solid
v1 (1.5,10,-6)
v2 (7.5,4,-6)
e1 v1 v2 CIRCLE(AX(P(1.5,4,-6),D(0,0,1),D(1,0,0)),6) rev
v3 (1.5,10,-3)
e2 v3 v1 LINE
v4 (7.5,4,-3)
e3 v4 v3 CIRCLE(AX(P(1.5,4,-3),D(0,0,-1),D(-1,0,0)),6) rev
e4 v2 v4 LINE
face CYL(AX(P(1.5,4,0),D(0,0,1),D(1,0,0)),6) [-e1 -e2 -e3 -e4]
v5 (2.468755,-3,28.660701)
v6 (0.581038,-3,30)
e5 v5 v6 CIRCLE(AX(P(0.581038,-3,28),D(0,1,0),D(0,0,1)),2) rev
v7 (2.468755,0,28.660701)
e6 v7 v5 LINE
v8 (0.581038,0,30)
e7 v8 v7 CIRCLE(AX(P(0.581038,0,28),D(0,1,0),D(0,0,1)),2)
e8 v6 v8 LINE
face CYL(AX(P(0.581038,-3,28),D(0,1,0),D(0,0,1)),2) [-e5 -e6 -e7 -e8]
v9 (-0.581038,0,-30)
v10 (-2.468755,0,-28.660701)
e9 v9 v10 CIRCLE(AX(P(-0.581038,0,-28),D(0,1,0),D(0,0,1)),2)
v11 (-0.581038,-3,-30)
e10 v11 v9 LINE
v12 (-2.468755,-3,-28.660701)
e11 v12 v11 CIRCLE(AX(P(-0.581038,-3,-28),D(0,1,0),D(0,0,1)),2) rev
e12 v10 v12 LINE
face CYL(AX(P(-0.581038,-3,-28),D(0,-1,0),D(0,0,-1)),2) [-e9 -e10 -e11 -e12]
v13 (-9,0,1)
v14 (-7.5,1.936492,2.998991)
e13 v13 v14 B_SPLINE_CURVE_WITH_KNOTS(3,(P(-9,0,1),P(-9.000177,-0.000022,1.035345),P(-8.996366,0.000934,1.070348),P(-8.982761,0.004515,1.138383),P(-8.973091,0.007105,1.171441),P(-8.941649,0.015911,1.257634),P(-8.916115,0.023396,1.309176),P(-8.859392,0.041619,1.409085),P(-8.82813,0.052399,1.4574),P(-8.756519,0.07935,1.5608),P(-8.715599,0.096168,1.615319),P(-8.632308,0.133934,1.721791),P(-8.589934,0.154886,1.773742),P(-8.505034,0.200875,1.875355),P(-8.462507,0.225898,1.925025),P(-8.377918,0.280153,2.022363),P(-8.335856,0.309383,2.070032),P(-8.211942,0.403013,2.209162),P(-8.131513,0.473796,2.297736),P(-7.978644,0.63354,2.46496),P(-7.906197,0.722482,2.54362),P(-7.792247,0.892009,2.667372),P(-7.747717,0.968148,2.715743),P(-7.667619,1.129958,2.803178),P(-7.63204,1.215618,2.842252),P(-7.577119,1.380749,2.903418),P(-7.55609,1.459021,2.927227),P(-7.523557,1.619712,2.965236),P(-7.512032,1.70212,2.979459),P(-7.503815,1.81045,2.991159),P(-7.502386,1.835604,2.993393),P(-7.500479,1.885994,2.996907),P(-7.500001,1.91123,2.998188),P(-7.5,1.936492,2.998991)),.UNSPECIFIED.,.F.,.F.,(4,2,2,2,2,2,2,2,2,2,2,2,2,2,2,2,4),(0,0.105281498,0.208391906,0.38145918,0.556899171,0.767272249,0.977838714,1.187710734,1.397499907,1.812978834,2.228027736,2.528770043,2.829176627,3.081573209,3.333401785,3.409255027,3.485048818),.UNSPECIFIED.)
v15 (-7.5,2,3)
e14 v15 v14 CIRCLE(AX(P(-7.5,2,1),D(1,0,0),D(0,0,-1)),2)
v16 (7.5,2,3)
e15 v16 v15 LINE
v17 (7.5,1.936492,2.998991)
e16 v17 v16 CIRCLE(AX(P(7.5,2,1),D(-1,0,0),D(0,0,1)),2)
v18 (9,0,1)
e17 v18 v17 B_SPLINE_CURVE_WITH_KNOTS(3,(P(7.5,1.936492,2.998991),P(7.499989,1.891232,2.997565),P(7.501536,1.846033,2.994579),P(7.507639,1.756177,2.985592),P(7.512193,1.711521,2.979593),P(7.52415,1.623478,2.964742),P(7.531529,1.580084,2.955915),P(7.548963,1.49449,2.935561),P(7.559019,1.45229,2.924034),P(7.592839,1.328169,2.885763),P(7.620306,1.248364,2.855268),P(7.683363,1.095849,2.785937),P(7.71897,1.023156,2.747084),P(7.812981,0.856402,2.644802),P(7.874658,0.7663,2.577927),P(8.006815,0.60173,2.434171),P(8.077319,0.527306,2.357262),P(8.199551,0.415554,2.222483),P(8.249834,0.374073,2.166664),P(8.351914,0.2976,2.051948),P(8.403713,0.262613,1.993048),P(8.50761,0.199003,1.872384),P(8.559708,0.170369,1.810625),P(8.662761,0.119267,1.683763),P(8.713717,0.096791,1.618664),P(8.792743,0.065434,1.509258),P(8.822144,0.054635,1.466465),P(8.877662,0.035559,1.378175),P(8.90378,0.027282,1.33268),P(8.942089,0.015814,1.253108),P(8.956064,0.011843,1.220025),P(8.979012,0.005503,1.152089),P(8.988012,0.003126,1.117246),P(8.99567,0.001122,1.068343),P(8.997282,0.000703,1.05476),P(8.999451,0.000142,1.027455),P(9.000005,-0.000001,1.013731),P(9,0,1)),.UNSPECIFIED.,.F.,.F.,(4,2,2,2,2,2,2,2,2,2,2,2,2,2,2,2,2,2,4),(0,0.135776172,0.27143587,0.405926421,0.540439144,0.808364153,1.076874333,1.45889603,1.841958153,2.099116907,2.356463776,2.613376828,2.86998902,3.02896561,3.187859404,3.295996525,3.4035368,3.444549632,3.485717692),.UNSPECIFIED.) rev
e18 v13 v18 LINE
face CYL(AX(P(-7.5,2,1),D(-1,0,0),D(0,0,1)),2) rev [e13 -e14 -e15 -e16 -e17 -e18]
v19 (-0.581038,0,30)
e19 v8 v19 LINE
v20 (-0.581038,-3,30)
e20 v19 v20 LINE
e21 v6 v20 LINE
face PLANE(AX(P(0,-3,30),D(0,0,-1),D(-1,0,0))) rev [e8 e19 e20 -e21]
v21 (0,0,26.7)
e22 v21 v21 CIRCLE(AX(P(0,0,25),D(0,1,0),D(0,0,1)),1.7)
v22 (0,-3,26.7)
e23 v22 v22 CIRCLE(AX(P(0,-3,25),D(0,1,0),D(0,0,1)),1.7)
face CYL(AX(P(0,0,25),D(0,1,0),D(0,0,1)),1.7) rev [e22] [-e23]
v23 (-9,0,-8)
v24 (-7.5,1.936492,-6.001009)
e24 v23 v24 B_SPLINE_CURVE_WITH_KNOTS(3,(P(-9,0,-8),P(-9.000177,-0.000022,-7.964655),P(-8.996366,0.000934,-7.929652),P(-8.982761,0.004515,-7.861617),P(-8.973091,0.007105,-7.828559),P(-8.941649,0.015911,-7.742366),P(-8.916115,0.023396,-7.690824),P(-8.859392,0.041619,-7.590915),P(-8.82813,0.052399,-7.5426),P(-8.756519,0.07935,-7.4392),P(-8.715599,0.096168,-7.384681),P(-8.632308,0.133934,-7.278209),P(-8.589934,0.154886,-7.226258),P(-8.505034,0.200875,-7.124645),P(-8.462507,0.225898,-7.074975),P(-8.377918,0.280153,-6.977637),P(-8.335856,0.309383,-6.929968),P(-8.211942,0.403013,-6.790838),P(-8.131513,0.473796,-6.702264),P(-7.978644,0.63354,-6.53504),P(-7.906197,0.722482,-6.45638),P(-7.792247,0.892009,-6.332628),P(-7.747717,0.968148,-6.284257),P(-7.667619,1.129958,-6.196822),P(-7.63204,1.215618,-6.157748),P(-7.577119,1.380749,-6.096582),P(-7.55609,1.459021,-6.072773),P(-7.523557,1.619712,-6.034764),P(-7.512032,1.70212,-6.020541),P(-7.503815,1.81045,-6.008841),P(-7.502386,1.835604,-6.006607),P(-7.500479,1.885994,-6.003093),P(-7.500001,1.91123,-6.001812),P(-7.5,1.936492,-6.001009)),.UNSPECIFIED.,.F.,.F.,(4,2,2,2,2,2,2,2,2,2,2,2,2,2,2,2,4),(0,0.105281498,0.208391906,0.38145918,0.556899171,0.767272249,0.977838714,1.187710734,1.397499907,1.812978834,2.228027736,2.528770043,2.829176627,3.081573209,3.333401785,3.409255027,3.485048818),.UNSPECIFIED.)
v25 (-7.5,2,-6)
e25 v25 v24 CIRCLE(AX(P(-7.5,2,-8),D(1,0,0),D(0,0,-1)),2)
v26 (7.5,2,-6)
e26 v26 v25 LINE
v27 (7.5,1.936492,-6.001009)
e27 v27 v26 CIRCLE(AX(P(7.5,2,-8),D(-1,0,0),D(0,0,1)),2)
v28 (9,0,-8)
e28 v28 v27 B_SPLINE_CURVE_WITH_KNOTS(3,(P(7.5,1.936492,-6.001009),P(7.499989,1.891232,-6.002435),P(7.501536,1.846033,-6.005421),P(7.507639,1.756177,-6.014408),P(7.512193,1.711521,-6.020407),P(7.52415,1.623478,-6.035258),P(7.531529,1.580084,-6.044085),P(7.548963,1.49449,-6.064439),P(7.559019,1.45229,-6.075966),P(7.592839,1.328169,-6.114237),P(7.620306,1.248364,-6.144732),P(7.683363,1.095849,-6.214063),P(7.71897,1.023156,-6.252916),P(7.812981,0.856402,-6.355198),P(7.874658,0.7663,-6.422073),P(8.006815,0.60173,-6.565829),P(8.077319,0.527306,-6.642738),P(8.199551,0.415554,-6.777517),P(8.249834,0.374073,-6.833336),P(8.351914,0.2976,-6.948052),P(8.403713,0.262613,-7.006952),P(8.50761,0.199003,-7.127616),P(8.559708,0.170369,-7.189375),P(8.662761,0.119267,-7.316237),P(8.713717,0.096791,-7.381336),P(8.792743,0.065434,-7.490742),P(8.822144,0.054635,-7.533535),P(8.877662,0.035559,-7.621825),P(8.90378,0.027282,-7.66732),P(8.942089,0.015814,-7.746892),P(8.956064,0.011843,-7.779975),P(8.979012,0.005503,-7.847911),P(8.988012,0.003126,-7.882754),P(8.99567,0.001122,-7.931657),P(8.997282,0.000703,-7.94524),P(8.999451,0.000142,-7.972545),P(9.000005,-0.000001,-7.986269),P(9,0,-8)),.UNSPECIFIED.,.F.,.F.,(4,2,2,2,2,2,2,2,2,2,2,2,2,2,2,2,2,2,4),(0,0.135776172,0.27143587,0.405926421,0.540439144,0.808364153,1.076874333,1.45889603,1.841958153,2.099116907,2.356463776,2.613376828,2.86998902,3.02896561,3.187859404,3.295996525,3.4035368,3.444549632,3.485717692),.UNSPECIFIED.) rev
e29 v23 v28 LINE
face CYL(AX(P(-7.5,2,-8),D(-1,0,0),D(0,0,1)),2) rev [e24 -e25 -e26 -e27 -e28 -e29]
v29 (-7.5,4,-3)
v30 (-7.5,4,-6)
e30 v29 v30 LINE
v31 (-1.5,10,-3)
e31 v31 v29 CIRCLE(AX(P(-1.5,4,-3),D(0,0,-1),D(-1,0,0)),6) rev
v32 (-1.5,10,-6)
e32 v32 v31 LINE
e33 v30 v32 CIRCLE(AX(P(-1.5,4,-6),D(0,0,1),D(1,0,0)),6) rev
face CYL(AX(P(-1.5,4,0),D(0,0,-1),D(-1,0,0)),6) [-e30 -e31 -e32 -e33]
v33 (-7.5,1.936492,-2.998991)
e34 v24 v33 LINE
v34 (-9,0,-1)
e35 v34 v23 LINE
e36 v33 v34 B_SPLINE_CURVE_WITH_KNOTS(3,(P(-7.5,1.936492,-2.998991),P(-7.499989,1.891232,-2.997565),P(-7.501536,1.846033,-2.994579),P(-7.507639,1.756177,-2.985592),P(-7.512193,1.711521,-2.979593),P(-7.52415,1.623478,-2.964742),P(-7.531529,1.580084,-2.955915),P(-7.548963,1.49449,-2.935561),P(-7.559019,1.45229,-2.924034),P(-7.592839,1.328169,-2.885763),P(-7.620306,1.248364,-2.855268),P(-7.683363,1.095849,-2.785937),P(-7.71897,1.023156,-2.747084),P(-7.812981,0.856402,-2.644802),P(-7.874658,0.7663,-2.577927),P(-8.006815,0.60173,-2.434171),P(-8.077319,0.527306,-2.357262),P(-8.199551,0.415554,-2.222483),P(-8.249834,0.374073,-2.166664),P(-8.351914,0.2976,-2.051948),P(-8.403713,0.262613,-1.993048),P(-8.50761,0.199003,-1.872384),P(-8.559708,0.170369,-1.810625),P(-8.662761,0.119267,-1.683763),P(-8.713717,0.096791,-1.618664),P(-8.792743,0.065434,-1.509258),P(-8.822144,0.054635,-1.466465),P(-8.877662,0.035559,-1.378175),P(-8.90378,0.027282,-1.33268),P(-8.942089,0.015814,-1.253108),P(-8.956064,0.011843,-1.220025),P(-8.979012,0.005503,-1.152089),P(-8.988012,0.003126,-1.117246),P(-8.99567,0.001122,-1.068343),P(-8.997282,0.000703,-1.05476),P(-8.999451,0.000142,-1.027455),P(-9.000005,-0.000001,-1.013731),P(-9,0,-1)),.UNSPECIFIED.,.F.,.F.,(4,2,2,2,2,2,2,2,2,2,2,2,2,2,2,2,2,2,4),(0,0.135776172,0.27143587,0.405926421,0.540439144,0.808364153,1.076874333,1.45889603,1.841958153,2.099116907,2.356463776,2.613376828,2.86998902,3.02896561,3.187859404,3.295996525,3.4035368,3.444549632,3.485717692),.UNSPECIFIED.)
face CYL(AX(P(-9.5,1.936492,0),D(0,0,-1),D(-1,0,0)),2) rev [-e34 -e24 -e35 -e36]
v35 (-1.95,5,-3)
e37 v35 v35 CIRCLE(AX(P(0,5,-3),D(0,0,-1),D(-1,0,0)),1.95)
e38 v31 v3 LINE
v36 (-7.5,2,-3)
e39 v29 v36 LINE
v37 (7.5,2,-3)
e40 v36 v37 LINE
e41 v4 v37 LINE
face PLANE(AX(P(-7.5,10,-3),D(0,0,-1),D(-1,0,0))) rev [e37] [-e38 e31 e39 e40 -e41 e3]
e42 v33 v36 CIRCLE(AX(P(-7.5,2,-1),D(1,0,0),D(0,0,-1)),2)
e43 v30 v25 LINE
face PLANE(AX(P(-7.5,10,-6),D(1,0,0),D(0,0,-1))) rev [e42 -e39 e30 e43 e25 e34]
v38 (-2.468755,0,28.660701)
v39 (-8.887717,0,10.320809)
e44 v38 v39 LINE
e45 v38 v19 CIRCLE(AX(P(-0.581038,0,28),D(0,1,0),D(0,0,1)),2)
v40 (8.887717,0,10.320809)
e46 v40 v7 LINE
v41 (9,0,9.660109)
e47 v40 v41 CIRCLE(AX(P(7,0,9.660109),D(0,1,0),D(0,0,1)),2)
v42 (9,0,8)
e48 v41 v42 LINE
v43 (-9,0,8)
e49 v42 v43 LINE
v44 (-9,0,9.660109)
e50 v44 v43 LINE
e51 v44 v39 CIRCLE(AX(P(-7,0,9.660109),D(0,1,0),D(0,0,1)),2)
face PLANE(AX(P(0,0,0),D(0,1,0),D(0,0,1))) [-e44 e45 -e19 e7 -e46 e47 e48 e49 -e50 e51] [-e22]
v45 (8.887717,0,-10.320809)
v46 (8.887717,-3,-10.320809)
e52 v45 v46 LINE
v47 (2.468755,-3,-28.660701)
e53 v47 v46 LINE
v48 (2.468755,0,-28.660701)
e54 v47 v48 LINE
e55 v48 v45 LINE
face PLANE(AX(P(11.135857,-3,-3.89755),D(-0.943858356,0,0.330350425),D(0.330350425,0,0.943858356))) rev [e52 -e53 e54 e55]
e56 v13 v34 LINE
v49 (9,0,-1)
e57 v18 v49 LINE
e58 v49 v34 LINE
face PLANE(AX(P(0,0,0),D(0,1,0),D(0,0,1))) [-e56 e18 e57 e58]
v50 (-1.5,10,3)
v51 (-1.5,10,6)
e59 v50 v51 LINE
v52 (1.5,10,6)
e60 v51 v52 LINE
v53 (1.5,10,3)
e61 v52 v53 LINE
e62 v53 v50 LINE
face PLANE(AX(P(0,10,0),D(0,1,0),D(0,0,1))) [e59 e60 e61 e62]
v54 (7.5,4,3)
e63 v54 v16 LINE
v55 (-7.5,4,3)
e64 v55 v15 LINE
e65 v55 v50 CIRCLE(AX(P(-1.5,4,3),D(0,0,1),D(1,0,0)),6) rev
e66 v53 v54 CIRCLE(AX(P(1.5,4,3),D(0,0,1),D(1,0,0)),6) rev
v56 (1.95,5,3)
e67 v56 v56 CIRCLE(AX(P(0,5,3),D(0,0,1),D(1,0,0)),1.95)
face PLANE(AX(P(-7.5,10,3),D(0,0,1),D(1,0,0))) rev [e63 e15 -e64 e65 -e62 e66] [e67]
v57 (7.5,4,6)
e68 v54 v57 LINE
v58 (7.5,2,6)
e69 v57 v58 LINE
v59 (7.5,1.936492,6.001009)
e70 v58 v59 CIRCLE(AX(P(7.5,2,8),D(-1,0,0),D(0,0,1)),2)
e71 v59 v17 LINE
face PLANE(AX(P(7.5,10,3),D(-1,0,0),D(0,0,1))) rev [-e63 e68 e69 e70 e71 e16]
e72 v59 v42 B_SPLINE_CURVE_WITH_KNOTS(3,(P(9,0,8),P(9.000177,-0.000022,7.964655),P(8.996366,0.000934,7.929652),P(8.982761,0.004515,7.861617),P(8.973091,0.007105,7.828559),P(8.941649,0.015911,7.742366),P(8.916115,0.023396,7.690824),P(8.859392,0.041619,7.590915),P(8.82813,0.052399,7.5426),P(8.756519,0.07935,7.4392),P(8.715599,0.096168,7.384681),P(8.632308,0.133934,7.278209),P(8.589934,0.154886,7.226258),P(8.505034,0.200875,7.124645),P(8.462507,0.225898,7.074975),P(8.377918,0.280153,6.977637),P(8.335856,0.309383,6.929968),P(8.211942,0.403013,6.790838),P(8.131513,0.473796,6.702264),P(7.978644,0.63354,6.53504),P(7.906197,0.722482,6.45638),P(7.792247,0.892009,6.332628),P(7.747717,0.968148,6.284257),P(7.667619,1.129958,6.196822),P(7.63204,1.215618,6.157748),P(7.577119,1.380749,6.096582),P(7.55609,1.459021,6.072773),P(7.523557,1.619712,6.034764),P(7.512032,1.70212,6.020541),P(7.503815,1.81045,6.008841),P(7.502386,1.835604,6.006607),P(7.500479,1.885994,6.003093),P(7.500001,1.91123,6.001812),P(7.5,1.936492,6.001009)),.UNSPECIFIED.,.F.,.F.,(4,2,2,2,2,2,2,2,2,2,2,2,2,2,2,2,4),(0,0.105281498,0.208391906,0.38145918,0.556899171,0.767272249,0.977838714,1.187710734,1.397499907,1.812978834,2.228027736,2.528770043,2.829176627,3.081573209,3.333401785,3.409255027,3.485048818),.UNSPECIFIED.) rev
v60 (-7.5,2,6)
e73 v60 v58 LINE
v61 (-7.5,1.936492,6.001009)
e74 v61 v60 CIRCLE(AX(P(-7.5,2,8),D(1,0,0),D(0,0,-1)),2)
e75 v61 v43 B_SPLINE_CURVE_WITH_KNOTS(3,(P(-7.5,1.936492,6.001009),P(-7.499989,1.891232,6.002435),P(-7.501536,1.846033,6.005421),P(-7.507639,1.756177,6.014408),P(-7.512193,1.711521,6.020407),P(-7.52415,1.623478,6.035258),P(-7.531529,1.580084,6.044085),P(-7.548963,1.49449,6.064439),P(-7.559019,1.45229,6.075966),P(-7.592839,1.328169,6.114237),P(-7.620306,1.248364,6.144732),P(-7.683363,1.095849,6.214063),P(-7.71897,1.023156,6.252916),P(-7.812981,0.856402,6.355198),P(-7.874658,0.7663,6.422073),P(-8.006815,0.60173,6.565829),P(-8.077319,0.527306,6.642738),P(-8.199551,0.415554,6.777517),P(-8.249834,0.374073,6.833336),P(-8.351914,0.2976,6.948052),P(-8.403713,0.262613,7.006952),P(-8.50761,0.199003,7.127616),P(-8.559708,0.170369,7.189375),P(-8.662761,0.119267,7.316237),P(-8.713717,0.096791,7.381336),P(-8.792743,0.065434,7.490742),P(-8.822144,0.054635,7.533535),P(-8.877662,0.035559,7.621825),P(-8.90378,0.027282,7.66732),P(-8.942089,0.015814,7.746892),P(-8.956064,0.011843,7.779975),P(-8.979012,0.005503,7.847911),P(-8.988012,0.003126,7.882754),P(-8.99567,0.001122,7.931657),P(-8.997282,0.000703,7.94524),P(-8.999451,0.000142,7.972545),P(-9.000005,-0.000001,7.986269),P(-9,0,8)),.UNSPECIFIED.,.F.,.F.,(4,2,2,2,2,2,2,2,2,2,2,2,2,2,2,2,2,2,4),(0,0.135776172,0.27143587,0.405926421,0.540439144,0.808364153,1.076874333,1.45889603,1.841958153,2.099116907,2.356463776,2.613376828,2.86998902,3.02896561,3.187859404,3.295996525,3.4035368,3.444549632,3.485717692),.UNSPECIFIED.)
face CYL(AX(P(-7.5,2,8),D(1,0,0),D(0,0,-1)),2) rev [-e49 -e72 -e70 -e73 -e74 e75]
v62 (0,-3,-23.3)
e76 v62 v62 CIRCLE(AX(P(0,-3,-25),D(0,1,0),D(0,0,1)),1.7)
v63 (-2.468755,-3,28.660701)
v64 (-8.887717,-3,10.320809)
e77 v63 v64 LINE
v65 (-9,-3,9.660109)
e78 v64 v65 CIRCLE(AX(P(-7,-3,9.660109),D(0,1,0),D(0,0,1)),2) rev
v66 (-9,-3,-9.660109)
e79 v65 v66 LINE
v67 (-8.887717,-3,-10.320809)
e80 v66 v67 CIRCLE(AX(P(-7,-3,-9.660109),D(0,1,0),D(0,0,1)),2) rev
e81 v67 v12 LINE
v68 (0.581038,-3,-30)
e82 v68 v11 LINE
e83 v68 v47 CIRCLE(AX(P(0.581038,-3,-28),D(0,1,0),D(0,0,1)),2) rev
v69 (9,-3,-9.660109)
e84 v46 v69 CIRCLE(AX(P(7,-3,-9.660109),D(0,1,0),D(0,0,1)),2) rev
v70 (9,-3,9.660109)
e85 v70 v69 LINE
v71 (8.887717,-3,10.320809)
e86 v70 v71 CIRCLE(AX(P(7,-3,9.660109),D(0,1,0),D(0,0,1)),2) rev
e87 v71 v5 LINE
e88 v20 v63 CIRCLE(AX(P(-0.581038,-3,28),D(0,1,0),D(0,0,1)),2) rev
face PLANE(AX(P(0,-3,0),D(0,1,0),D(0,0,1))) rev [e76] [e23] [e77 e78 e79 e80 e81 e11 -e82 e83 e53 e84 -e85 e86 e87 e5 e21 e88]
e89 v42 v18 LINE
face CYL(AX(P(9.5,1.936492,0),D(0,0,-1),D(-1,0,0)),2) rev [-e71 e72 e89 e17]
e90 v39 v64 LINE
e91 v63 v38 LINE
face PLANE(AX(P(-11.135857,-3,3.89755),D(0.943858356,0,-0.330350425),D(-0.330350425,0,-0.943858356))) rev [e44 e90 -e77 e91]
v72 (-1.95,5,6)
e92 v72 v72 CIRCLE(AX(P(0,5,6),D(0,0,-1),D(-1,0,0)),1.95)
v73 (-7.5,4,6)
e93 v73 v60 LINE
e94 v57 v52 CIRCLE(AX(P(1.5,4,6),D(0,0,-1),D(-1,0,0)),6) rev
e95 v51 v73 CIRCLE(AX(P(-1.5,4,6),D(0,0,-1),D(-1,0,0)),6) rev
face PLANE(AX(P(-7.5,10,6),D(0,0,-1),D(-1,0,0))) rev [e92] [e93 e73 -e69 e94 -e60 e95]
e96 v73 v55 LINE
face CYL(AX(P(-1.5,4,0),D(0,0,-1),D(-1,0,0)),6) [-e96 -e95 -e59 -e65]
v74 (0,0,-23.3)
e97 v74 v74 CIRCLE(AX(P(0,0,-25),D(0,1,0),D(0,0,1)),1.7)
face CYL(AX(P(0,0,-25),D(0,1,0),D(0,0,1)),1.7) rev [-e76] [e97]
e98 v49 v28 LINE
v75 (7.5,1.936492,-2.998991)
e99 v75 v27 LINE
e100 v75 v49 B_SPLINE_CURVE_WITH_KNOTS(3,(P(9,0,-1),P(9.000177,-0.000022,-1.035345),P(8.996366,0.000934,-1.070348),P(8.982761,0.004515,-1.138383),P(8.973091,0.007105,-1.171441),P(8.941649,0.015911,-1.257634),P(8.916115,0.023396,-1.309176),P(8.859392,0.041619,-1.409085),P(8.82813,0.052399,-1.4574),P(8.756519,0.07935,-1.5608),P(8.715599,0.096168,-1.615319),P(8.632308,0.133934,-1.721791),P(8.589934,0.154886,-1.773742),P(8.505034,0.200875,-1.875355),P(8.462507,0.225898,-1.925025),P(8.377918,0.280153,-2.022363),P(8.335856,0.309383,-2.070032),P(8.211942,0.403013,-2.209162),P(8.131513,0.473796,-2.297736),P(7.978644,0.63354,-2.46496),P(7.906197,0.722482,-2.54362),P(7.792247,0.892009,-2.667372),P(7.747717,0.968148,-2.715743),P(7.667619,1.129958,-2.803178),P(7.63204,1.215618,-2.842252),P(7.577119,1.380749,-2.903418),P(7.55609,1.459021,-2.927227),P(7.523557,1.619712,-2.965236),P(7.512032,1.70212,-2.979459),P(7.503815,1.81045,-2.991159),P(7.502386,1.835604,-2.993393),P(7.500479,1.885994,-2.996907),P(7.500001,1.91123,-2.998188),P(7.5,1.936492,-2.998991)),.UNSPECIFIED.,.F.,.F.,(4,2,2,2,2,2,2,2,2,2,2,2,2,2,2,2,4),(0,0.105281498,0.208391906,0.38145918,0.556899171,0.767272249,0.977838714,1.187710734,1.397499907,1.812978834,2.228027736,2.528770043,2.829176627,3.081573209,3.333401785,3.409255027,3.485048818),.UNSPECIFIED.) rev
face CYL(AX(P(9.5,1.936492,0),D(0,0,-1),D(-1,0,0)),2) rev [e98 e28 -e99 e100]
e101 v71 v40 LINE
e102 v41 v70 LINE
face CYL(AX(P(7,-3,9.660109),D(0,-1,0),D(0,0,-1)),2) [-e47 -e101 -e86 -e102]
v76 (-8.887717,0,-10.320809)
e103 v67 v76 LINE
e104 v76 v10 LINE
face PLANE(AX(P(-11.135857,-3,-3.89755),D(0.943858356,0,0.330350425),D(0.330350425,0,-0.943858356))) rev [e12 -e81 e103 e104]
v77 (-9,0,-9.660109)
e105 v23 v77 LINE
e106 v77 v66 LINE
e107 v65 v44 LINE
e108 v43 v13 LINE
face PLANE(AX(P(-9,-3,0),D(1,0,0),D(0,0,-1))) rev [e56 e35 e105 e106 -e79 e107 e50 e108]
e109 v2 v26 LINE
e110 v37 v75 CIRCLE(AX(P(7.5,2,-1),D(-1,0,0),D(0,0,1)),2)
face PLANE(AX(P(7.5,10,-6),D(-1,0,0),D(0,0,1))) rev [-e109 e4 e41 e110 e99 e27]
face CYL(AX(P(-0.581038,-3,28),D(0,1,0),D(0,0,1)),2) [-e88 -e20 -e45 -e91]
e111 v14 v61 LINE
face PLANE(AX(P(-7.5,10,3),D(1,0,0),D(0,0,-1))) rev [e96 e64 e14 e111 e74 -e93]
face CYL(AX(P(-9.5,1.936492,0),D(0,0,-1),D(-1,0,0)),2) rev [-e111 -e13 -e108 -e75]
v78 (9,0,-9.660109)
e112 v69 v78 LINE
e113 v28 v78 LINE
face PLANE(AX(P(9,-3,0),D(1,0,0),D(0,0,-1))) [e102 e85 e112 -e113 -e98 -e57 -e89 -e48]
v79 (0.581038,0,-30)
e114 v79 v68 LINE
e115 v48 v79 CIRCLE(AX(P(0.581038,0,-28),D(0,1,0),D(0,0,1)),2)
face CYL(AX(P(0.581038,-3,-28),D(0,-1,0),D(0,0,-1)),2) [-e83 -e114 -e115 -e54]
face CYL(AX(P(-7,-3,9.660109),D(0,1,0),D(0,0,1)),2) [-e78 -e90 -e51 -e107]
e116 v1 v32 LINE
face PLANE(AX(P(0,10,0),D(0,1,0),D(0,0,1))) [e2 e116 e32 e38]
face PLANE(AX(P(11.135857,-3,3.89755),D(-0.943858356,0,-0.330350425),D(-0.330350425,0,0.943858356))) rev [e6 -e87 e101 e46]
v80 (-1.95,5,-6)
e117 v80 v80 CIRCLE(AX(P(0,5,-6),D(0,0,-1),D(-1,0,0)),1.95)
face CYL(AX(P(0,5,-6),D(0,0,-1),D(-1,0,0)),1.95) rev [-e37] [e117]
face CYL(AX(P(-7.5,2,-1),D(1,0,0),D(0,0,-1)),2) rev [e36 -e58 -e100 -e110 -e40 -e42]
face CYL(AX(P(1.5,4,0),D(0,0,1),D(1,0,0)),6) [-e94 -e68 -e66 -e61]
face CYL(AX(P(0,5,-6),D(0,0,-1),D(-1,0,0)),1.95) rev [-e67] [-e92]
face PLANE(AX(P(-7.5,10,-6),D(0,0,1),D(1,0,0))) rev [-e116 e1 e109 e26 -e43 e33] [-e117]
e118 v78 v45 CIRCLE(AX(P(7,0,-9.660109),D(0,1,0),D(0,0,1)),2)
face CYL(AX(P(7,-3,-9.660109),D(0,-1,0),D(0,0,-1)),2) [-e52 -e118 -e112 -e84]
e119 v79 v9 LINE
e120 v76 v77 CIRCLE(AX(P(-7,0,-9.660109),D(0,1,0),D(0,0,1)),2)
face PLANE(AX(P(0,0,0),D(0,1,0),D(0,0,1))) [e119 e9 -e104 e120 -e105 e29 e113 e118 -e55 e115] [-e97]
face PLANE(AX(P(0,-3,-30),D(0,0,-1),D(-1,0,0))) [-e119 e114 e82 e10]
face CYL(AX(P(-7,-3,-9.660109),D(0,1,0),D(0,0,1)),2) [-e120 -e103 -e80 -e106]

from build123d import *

# Parameters (mm, degrees)
EXTRUDE_1_DEPTH      = 3
SKETCH_2_W           = 15
SKETCH_2_H           = 3
EXTRUDE_2_DEPTH      = 10
FILLET_1_R           = 6
FILLET_2_R           = 2
HOLE_WIZARD_M3_1_D   = 3.4
HOLE_WIZARD_M3_5_1_D = 3.9


with BuildPart() as part:
    # 草图1 → 凸台-拉伸1 (new body)
    with BuildSketch(Plane(origin=(0, 0, 0), x_dir=(1, 0, 0), z_dir=(0, 1, 0))):
        Polygon((9, 10), (2, 30), (-2, 30), (-9, 10), (-9, -10), (-2, -30), (2, -30), (9, -10), align=None)
    extrude(amount=-EXTRUDE_1_DEPTH)

    # 草图2 → 凸台-拉伸2 (add)
    with BuildSketch(Plane(origin=(0, 0, 0), x_dir=(1, 0, 0), z_dir=(0, 1, 0))):
        with Locations((0, 4.5)):
            Rectangle(SKETCH_2_W, SKETCH_2_H)
        with Locations((0, -4.5)):
            Rectangle(SKETCH_2_W, SKETCH_2_H)
    extrude(amount=EXTRUDE_2_DEPTH)

    # 圆角1
    fillet_1_edges = [part.edges().sort_by_distance(p)[0] for p in [
        (-7.5, 10, -4.5),
        (7.5, 10, -4.5),
        (-7.5, 10, 4.5),
        (7.5, 10, 4.5),
    ]]
    fillet(fillet_1_edges, radius=FILLET_1_R)

    # 圆角2
    # the kernel refuses this fillet: 2 mm, written as the material it adds along each edge
    with BuildSketch(Plane(origin=(-7.5, 0, -3), x_dir=(-1, 0, 0), z_dir=(0, 0, -1)), Plane(origin=(7.5, 0, -6), x_dir=(1, 0, 0), z_dir=(0, 0, 1)), Plane(origin=(7.5, 0, 3), x_dir=(1, 0, 0), z_dir=(0, 0, 1))) as fillet_2_piece_1:
        with BuildLine():
            CenterArc((2, 1.936491673), FILLET_2_R, 180, 75.522487814)
            Line((0, 1.936491673), (0, 0))
            Line((0, 0), (1.5, 0))
        make_face()
    extrude(amount=3)
    with BuildSketch(Plane(origin=(7.5, 0, -3), x_dir=(0, 0, 1), z_dir=(-1, 0, 0)), Plane(origin=(-7.5, 0, -6), x_dir=(0, 0, -1), z_dir=(1, 0, 0)), Plane(origin=(-7.5, 0, 3), x_dir=(0, 0, -1), z_dir=(1, 0, 0))) as fillet_2_piece_2:
        with BuildLine():
            CenterArc((FILLET_2_R, FILLET_2_R), FILLET_2_R, 180, 90)
            Line((0, FILLET_2_R), (0, 0))
            Line((0, 0), (FILLET_2_R, 0))
        make_face()
    extrude(amount=15)
    with BuildSketch(Plane(origin=(-7.5, 0, 6), x_dir=(0, 1, 0), z_dir=(0, 0, -1))) as fillet_2_piece_3:
        with BuildLine():
            CenterArc((1.936491673, -2), FILLET_2_R, 90, 75.522487814)
            Line((0, -1.5), (0, 0))
            Line((0, 0), (1.936491673, 0))
        make_face()
    extrude(amount=3)
    with BuildSketch(Plane(origin=(7.5, 0, 6), x_dir=(0, 1, 0), z_dir=(-1, 0, 0))) as fillet_2_piece_4:
        with BuildLine():
            CenterArc((FILLET_2_R, -FILLET_2_R), FILLET_2_R, 90, 90)
            Line((0, -FILLET_2_R), (0, 0))
            Line((0, 0), (FILLET_2_R, 0))
        make_face()
    extrude(amount=15)
    with BuildSketch(Plane(origin=(-7.5, 0, 1.841229183), x_dir=(-1, 0, 0), z_dir=(0, 0, -1))) as fillet_2_piece_5a_section:
        with BuildLine():
            CenterArc((2, 1.936491673), FILLET_2_R, 180, 75.522487814)
            Line((0, 1.936491673), (0, 0))
            Line((0, 0), (1.5, 0))
        make_face()
    fillet_2_piece_5a = extrude(amount=7.841229183, mode=Mode.PRIVATE)
    fillet_2_piece_5a = split(fillet_2_piece_5a, bisect_by=Plane(origin=(-7.5, 0, -3), z_dir=(0, 0, 1)), keep=Keep.TOP, mode=Mode.PRIVATE)
    with BuildSketch(Plane(origin=(7.5, 0, -3), x_dir=(0, 0, 1), z_dir=(-1, 0, 0))) as fillet_2_piece_5b_section:
        with BuildLine():
            CenterArc((FILLET_2_R, FILLET_2_R), FILLET_2_R, 180, 90)
            Line((0, FILLET_2_R), (0, 0))
            Line((0, 0), (FILLET_2_R, 0))
        make_face()
    fillet_2_piece_5b = extrude(amount=20, mode=Mode.PRIVATE)
    fillet_2_piece_5b = split(fillet_2_piece_5b, bisect_by=Plane(origin=(-9, 0, -3), z_dir=(1, 0, 0)), keep=Keep.TOP, mode=Mode.PRIVATE)
    fillet_2_piece_5b = split(fillet_2_piece_5b, bisect_by=Plane(origin=(-7.5, 0, -3), z_dir=(-1, 0, 0)), keep=Keep.TOP, mode=Mode.PRIVATE)
    fillet_2_piece_5 = fillet_2_piece_5a & fillet_2_piece_5b
    add(fillet_2_piece_5)
    with BuildSketch(Plane(origin=(-7.5, 0, -3), x_dir=(-1, 0, 0), z_dir=(0, 0, -1))) as fillet_2_piece_6a_section:
        with BuildLine():
            CenterArc((2, 1.936491673), FILLET_2_R, 180, 75.522487814)
            Line((0, 1.936491673), (0, 0))
            Line((0, 0), (1.5, 0))
        make_face()
    fillet_2_piece_6a = extrude(amount=7.841229183, mode=Mode.PRIVATE)
    fillet_2_piece_6a = split(fillet_2_piece_6a, bisect_by=Plane(origin=(-11.018930958, 0, -4.231625835), z_dir=(0.9438583563660174, 0, 0.3303504247281063)), keep=Keep.TOP, mode=Mode.PRIVATE)
    fillet_2_piece_6a = split(fillet_2_piece_6a, bisect_by=Plane(origin=(-7.5, 0, -6), z_dir=(0, 0, -1)), keep=Keep.TOP, mode=Mode.PRIVATE)
    with BuildSketch(Plane(origin=(-12.5, 0, -6), x_dir=(0, 0, -1), z_dir=(1, 0, 0))) as fillet_2_piece_6b_section:
        with BuildLine():
            CenterArc((FILLET_2_R, FILLET_2_R), FILLET_2_R, 180, 90)
            Line((0, FILLET_2_R), (0, 0))
            Line((0, 0), (FILLET_2_R, 0))
        make_face()
    fillet_2_piece_6b = extrude(amount=20, mode=Mode.PRIVATE)
    fillet_2_piece_6b = split(fillet_2_piece_6b, bisect_by=Plane(origin=(-9, 0, -6), z_dir=(1, 0, 0)), keep=Keep.TOP, mode=Mode.PRIVATE)
    fillet_2_piece_6b = split(fillet_2_piece_6b, bisect_by=Plane(origin=(-7.5, 0, -6), z_dir=(-1, 0, 0)), keep=Keep.TOP, mode=Mode.PRIVATE)
    fillet_2_piece_6 = fillet_2_piece_6a & fillet_2_piece_6b
    add(fillet_2_piece_6)
    with BuildSketch(Plane(origin=(12.5, 0, -3), x_dir=(0, 0, 1), z_dir=(-1, 0, 0))) as fillet_2_piece_7a_section:
        with BuildLine():
            CenterArc((FILLET_2_R, FILLET_2_R), FILLET_2_R, 180, 90)
            Line((0, FILLET_2_R), (0, 0))
            Line((0, 0), (FILLET_2_R, 0))
        make_face()
    fillet_2_piece_7a = extrude(amount=20, mode=Mode.PRIVATE)
    fillet_2_piece_7a = split(fillet_2_piece_7a, bisect_by=Plane(origin=(9, 0, -3), z_dir=(-1, 0, 0)), keep=Keep.TOP, mode=Mode.PRIVATE)
    fillet_2_piece_7a = split(fillet_2_piece_7a, bisect_by=Plane(origin=(7.5, 0, -3), z_dir=(1, 0, 0)), keep=Keep.TOP, mode=Mode.PRIVATE)
    with BuildSketch(Plane(origin=(7.5, 0, -6), x_dir=(1, 0, 0), z_dir=(0, 0, 1))) as fillet_2_piece_7b_section:
        with BuildLine():
            CenterArc((2, 1.936491673), FILLET_2_R, 180, 75.522487814)
            Line((0, 1.936491673), (0, 0))
            Line((0, 0), (1.5, 0))
        make_face()
    fillet_2_piece_7b = extrude(amount=7.841229183, mode=Mode.PRIVATE)
    fillet_2_piece_7b = split(fillet_2_piece_7b, bisect_by=Plane(origin=(7.5, 0, -3), z_dir=(0, 0, 1)), keep=Keep.TOP, mode=Mode.PRIVATE)
    fillet_2_piece_7 = fillet_2_piece_7a & fillet_2_piece_7b
    add(fillet_2_piece_7)
    with BuildSketch(Plane(origin=(7.5, 0, -10.841229183), x_dir=(1, 0, 0), z_dir=(0, 0, 1))) as fillet_2_piece_8a_section:
        with BuildLine():
            CenterArc((2, 1.936491673), FILLET_2_R, 180, 75.522487814)
            Line((0, 1.936491673), (0, 0))
            Line((0, 0), (1.5, 0))
        make_face()
    fillet_2_piece_8a = extrude(amount=7.841229183, mode=Mode.PRIVATE)
    fillet_2_piece_8a = split(fillet_2_piece_8a, bisect_by=Plane(origin=(8.574004264, 0, -11.217130675), z_dir=(-0.9438583563660174, 0, 0.3303504247281061)), keep=Keep.TOP, mode=Mode.PRIVATE)
    fillet_2_piece_8a = split(fillet_2_piece_8a, bisect_by=Plane(origin=(7.5, 0, -6), z_dir=(0, 0, -1)), keep=Keep.TOP, mode=Mode.PRIVATE)
    with BuildSketch(Plane(origin=(-7.5, 0, -6), x_dir=(0, 0, -1), z_dir=(1, 0, 0))) as fillet_2_piece_8b_section:
        with BuildLine():
            CenterArc((FILLET_2_R, FILLET_2_R), FILLET_2_R, 180, 90)
            Line((0, FILLET_2_R), (0, 0))
            Line((0, 0), (FILLET_2_R, 0))
        make_face()
    fillet_2_piece_8b = extrude(amount=20, mode=Mode.PRIVATE)
    fillet_2_piece_8b = split(fillet_2_piece_8b, bisect_by=Plane(origin=(9, 0, -6), z_dir=(-1, 0, 0)), keep=Keep.TOP, mode=Mode.PRIVATE)
    fillet_2_piece_8b = split(fillet_2_piece_8b, bisect_by=Plane(origin=(7.5, 0, -6), z_dir=(1, 0, 0)), keep=Keep.TOP, mode=Mode.PRIVATE)
    fillet_2_piece_8 = fillet_2_piece_8a & fillet_2_piece_8b
    add(fillet_2_piece_8)
    with BuildSketch(Plane(origin=(-7.5, 0, 10.841229183), x_dir=(0, 1, 0), z_dir=(0, 0, -1))) as fillet_2_piece_9a_section:
        with BuildLine():
            CenterArc((1.936491673, -2), FILLET_2_R, 90, 75.522487814)
            Line((0, -1.5), (0, 0))
            Line((0, 0), (1.936491673, 0))
        make_face()
    fillet_2_piece_9a = extrude(amount=7.841229183, mode=Mode.PRIVATE)
    fillet_2_piece_9a = split(fillet_2_piece_9a, bisect_by=Plane(origin=(-7.5, 0, 6), z_dir=(0, 0, 1)), keep=Keep.TOP, mode=Mode.PRIVATE)
    fillet_2_piece_9a = split(fillet_2_piece_9a, bisect_by=Plane(origin=(-8.574004264, 0, 11.217130675), z_dir=(0.9438583563660174, 0, -0.33035042472810616)), keep=Keep.TOP, mode=Mode.PRIVATE)
    with BuildSketch(Plane(origin=(7.5, 0, 6), x_dir=(0, 1, 0), z_dir=(-1, 0, 0))) as fillet_2_piece_9b_section:
        with BuildLine():
            CenterArc((FILLET_2_R, -FILLET_2_R), FILLET_2_R, 90, 90)
            Line((0, -FILLET_2_R), (0, 0))
            Line((0, 0), (FILLET_2_R, 0))
        make_face()
    fillet_2_piece_9b = extrude(amount=20, mode=Mode.PRIVATE)
    fillet_2_piece_9b = split(fillet_2_piece_9b, bisect_by=Plane(origin=(-7.5, 0, 6), z_dir=(-1, 0, 0)), keep=Keep.TOP, mode=Mode.PRIVATE)
    fillet_2_piece_9b = split(fillet_2_piece_9b, bisect_by=Plane(origin=(-9, 0, 6), z_dir=(1, 0, 0)), keep=Keep.TOP, mode=Mode.PRIVATE)
    fillet_2_piece_9 = fillet_2_piece_9a & fillet_2_piece_9b
    add(fillet_2_piece_9)
    with BuildSketch(Plane(origin=(-7.5, 0, 6), x_dir=(0, 1, 0), z_dir=(0, 0, -1))) as fillet_2_piece_10a_section:
        with BuildLine():
            CenterArc((1.936491673, -2), FILLET_2_R, 90, 75.522487814)
            Line((0, -1.5), (0, 0))
            Line((0, 0), (1.936491673, 0))
        make_face()
    fillet_2_piece_10a = extrude(amount=7.841229183, mode=Mode.PRIVATE)
    fillet_2_piece_10a = split(fillet_2_piece_10a, bisect_by=Plane(origin=(-7.5, 0, 3), z_dir=(0, 0, -1)), keep=Keep.TOP, mode=Mode.PRIVATE)
    with BuildSketch(Plane(origin=(-12.5, 0, 3), x_dir=(0, 0, -1), z_dir=(1, 0, 0))) as fillet_2_piece_10b_section:
        with BuildLine():
            CenterArc((FILLET_2_R, FILLET_2_R), FILLET_2_R, 180, 90)
            Line((0, FILLET_2_R), (0, 0))
            Line((0, 0), (FILLET_2_R, 0))
        make_face()
    fillet_2_piece_10b = extrude(amount=20, mode=Mode.PRIVATE)
    fillet_2_piece_10b = split(fillet_2_piece_10b, bisect_by=Plane(origin=(-7.5, 0, 3), z_dir=(-1, 0, 0)), keep=Keep.TOP, mode=Mode.PRIVATE)
    fillet_2_piece_10b = split(fillet_2_piece_10b, bisect_by=Plane(origin=(-9, 0, 3), z_dir=(1, 0, 0)), keep=Keep.TOP, mode=Mode.PRIVATE)
    fillet_2_piece_10 = fillet_2_piece_10a & fillet_2_piece_10b
    add(fillet_2_piece_10)
    with BuildSketch(Plane(origin=(12.5, 0, 6), x_dir=(0, 1, 0), z_dir=(-1, 0, 0))) as fillet_2_piece_11a_section:
        with BuildLine():
            CenterArc((FILLET_2_R, -FILLET_2_R), FILLET_2_R, 90, 90)
            Line((0, -FILLET_2_R), (0, 0))
            Line((0, 0), (FILLET_2_R, 0))
        make_face()
    fillet_2_piece_11a = extrude(amount=20, mode=Mode.PRIVATE)
    fillet_2_piece_11a = split(fillet_2_piece_11a, bisect_by=Plane(origin=(7.5, 0, 6), z_dir=(1, 0, 0)), keep=Keep.TOP, mode=Mode.PRIVATE)
    fillet_2_piece_11a = split(fillet_2_piece_11a, bisect_by=Plane(origin=(9, 0, 6), z_dir=(-1, 0, 0)), keep=Keep.TOP, mode=Mode.PRIVATE)
    with BuildSketch(Plane(origin=(7.5, 0, 3), x_dir=(1, 0, 0), z_dir=(0, 0, 1))) as fillet_2_piece_11b_section:
        with BuildLine():
            CenterArc((2, 1.936491673), FILLET_2_R, 180, 75.522487814)
            Line((0, 1.936491673), (0, 0))
            Line((0, 0), (1.5, 0))
        make_face()
    fillet_2_piece_11b = extrude(amount=7.841229183, mode=Mode.PRIVATE)
    fillet_2_piece_11b = split(fillet_2_piece_11b, bisect_by=Plane(origin=(7.5, 0, 6), z_dir=(0, 0, 1)), keep=Keep.TOP, mode=Mode.PRIVATE)
    fillet_2_piece_11b = split(fillet_2_piece_11b, bisect_by=Plane(origin=(11.018930958, 0, 4.231625835), z_dir=(-0.9438583563660174, 0, -0.33035042472810605)), keep=Keep.TOP, mode=Mode.PRIVATE)
    fillet_2_piece_11 = fillet_2_piece_11a & fillet_2_piece_11b
    add(fillet_2_piece_11)
    with BuildSketch(Plane(origin=(7.5, 0, -1.841229183), x_dir=(1, 0, 0), z_dir=(0, 0, 1))) as fillet_2_piece_12a_section:
        with BuildLine():
            CenterArc((2, 1.936491673), FILLET_2_R, 180, 75.522487814)
            Line((0, 1.936491673), (0, 0))
            Line((0, 0), (1.5, 0))
        make_face()
    fillet_2_piece_12a = extrude(amount=7.841229183, mode=Mode.PRIVATE)
    fillet_2_piece_12a = split(fillet_2_piece_12a, bisect_by=Plane(origin=(7.5, 0, 3), z_dir=(0, 0, -1)), keep=Keep.TOP, mode=Mode.PRIVATE)
    with BuildSketch(Plane(origin=(-7.5, 0, 3), x_dir=(0, 0, -1), z_dir=(1, 0, 0))) as fillet_2_piece_12b_section:
        with BuildLine():
            CenterArc((FILLET_2_R, FILLET_2_R), FILLET_2_R, 180, 90)
            Line((0, FILLET_2_R), (0, 0))
            Line((0, 0), (FILLET_2_R, 0))
        make_face()
    fillet_2_piece_12b = extrude(amount=20, mode=Mode.PRIVATE)
    fillet_2_piece_12b = split(fillet_2_piece_12b, bisect_by=Plane(origin=(7.5, 0, 3), z_dir=(1, 0, 0)), keep=Keep.TOP, mode=Mode.PRIVATE)
    fillet_2_piece_12b = split(fillet_2_piece_12b, bisect_by=Plane(origin=(9, 0, 3), z_dir=(-1, 0, 0)), keep=Keep.TOP, mode=Mode.PRIVATE)
    fillet_2_piece_12 = fillet_2_piece_12a & fillet_2_piece_12b
    add(fillet_2_piece_12)
    # the kernel refuses this fillet: 2 mm, written as the material it takes off along each edge
    with BuildSketch(Plane(origin=(-2, 3.547405025, -30), x_dir=(1, 0, 0), z_dir=(0, -1, 0))) as fillet_2_2_piece_1:
        with BuildLine():
            CenterArc((FILLET_2_R * 0.709481005021, FILLET_2_R), FILLET_2_R, 199.290046219, 70.709953781)
            Line((-FILLET_2_R * 0.234377351345, FILLET_2_R * 0.669649575272), (0, 0))
            Line((0, 0), (FILLET_2_R * 0.709481005021, 0))
        make_face()
    extrude(amount=10.09481005, mode=Mode.SUBTRACT)
    with BuildSketch(Plane(origin=(2, 3.547405025, -30), x_dir=(-1, 0, 0), z_dir=(0, -1, 0)), Plane(origin=(2, 3.547405025, 30), x_dir=(0.3303504247281063, 0, -0.9438583563660173), z_dir=(0, -1, 0)), Plane(origin=(-2, 3.547405025, 30), x_dir=(1, 0, 0), z_dir=(0, -1, 0))) as fillet_2_2_piece_2:
        with BuildLine():
            CenterArc((FILLET_2_R * 0.709481005021, -FILLET_2_R), FILLET_2_R, 90, 70.709953781)
            Line((-FILLET_2_R * 0.234377351345, -FILLET_2_R * 0.669649575272), (0, 0))
            Line((0, 0), (FILLET_2_R * 0.709481005021, 0))
        make_face()
    extrude(amount=10.09481005, mode=Mode.SUBTRACT)
    with BuildSketch(Plane(origin=(9, 0.849728643, -10), x_dir=(-0.330350424728111, 0, -0.9438583563660158), z_dir=(0, -1, 0)), Plane(origin=(9, 0.849728643, 10), x_dir=(0, 0, -1), z_dir=(0, -1, 0)), Plane(origin=(-9, 0.849728643, -10), x_dir=(0, 0, 1), z_dir=(0, -1, 0))) as fillet_2_2_piece_3:
        with BuildLine():
            CenterArc((FILLET_2_R * 0.169945728631, -FILLET_2_R), FILLET_2_R, 90, 19.290046219)
            Line((-FILLET_2_R * 0.160404696097, -FILLET_2_R * 0.056141643634), (0, 0))
            Line((0, 0), (FILLET_2_R * 0.169945728631, 0))
        make_face()
    extrude(amount=4.699457286, mode=Mode.SUBTRACT)
    with BuildSketch(Plane(origin=(-9, 0.849728643, 10), x_dir=(0, 0, -1), z_dir=(0, -1, 0))) as fillet_2_2_piece_4:
        with BuildLine():
            CenterArc((FILLET_2_R * 0.169945728631, FILLET_2_R), FILLET_2_R, 250.709953781, 19.290046219)
            Line((-FILLET_2_R * 0.160404696097, FILLET_2_R * 0.056141643634), (0, 0))
            Line((0, 0), (FILLET_2_R * 0.169945728631, 0))
        make_face()
    extrude(amount=4.699457286, mode=Mode.SUBTRACT)

    # M3 间隙孔1 (through all)
    with Locations(Plane(origin=(0, 0, 0), x_dir=(1, 0, 0), z_dir=(0, 1, 0))):
        with Locations((0, 25), (0, -25)):
            Hole(HOLE_WIZARD_M3_1_D / 2)

    # M3.5 间隙孔1 (through all)
    with Locations(Plane(origin=(0, 0, -6), x_dir=(-1, 0, 0), z_dir=(0, 0, -1))):
        with Locations((0, 5)):
            Hole(HOLE_WIZARD_M3_5_1_D / 2)


solid = part.part
